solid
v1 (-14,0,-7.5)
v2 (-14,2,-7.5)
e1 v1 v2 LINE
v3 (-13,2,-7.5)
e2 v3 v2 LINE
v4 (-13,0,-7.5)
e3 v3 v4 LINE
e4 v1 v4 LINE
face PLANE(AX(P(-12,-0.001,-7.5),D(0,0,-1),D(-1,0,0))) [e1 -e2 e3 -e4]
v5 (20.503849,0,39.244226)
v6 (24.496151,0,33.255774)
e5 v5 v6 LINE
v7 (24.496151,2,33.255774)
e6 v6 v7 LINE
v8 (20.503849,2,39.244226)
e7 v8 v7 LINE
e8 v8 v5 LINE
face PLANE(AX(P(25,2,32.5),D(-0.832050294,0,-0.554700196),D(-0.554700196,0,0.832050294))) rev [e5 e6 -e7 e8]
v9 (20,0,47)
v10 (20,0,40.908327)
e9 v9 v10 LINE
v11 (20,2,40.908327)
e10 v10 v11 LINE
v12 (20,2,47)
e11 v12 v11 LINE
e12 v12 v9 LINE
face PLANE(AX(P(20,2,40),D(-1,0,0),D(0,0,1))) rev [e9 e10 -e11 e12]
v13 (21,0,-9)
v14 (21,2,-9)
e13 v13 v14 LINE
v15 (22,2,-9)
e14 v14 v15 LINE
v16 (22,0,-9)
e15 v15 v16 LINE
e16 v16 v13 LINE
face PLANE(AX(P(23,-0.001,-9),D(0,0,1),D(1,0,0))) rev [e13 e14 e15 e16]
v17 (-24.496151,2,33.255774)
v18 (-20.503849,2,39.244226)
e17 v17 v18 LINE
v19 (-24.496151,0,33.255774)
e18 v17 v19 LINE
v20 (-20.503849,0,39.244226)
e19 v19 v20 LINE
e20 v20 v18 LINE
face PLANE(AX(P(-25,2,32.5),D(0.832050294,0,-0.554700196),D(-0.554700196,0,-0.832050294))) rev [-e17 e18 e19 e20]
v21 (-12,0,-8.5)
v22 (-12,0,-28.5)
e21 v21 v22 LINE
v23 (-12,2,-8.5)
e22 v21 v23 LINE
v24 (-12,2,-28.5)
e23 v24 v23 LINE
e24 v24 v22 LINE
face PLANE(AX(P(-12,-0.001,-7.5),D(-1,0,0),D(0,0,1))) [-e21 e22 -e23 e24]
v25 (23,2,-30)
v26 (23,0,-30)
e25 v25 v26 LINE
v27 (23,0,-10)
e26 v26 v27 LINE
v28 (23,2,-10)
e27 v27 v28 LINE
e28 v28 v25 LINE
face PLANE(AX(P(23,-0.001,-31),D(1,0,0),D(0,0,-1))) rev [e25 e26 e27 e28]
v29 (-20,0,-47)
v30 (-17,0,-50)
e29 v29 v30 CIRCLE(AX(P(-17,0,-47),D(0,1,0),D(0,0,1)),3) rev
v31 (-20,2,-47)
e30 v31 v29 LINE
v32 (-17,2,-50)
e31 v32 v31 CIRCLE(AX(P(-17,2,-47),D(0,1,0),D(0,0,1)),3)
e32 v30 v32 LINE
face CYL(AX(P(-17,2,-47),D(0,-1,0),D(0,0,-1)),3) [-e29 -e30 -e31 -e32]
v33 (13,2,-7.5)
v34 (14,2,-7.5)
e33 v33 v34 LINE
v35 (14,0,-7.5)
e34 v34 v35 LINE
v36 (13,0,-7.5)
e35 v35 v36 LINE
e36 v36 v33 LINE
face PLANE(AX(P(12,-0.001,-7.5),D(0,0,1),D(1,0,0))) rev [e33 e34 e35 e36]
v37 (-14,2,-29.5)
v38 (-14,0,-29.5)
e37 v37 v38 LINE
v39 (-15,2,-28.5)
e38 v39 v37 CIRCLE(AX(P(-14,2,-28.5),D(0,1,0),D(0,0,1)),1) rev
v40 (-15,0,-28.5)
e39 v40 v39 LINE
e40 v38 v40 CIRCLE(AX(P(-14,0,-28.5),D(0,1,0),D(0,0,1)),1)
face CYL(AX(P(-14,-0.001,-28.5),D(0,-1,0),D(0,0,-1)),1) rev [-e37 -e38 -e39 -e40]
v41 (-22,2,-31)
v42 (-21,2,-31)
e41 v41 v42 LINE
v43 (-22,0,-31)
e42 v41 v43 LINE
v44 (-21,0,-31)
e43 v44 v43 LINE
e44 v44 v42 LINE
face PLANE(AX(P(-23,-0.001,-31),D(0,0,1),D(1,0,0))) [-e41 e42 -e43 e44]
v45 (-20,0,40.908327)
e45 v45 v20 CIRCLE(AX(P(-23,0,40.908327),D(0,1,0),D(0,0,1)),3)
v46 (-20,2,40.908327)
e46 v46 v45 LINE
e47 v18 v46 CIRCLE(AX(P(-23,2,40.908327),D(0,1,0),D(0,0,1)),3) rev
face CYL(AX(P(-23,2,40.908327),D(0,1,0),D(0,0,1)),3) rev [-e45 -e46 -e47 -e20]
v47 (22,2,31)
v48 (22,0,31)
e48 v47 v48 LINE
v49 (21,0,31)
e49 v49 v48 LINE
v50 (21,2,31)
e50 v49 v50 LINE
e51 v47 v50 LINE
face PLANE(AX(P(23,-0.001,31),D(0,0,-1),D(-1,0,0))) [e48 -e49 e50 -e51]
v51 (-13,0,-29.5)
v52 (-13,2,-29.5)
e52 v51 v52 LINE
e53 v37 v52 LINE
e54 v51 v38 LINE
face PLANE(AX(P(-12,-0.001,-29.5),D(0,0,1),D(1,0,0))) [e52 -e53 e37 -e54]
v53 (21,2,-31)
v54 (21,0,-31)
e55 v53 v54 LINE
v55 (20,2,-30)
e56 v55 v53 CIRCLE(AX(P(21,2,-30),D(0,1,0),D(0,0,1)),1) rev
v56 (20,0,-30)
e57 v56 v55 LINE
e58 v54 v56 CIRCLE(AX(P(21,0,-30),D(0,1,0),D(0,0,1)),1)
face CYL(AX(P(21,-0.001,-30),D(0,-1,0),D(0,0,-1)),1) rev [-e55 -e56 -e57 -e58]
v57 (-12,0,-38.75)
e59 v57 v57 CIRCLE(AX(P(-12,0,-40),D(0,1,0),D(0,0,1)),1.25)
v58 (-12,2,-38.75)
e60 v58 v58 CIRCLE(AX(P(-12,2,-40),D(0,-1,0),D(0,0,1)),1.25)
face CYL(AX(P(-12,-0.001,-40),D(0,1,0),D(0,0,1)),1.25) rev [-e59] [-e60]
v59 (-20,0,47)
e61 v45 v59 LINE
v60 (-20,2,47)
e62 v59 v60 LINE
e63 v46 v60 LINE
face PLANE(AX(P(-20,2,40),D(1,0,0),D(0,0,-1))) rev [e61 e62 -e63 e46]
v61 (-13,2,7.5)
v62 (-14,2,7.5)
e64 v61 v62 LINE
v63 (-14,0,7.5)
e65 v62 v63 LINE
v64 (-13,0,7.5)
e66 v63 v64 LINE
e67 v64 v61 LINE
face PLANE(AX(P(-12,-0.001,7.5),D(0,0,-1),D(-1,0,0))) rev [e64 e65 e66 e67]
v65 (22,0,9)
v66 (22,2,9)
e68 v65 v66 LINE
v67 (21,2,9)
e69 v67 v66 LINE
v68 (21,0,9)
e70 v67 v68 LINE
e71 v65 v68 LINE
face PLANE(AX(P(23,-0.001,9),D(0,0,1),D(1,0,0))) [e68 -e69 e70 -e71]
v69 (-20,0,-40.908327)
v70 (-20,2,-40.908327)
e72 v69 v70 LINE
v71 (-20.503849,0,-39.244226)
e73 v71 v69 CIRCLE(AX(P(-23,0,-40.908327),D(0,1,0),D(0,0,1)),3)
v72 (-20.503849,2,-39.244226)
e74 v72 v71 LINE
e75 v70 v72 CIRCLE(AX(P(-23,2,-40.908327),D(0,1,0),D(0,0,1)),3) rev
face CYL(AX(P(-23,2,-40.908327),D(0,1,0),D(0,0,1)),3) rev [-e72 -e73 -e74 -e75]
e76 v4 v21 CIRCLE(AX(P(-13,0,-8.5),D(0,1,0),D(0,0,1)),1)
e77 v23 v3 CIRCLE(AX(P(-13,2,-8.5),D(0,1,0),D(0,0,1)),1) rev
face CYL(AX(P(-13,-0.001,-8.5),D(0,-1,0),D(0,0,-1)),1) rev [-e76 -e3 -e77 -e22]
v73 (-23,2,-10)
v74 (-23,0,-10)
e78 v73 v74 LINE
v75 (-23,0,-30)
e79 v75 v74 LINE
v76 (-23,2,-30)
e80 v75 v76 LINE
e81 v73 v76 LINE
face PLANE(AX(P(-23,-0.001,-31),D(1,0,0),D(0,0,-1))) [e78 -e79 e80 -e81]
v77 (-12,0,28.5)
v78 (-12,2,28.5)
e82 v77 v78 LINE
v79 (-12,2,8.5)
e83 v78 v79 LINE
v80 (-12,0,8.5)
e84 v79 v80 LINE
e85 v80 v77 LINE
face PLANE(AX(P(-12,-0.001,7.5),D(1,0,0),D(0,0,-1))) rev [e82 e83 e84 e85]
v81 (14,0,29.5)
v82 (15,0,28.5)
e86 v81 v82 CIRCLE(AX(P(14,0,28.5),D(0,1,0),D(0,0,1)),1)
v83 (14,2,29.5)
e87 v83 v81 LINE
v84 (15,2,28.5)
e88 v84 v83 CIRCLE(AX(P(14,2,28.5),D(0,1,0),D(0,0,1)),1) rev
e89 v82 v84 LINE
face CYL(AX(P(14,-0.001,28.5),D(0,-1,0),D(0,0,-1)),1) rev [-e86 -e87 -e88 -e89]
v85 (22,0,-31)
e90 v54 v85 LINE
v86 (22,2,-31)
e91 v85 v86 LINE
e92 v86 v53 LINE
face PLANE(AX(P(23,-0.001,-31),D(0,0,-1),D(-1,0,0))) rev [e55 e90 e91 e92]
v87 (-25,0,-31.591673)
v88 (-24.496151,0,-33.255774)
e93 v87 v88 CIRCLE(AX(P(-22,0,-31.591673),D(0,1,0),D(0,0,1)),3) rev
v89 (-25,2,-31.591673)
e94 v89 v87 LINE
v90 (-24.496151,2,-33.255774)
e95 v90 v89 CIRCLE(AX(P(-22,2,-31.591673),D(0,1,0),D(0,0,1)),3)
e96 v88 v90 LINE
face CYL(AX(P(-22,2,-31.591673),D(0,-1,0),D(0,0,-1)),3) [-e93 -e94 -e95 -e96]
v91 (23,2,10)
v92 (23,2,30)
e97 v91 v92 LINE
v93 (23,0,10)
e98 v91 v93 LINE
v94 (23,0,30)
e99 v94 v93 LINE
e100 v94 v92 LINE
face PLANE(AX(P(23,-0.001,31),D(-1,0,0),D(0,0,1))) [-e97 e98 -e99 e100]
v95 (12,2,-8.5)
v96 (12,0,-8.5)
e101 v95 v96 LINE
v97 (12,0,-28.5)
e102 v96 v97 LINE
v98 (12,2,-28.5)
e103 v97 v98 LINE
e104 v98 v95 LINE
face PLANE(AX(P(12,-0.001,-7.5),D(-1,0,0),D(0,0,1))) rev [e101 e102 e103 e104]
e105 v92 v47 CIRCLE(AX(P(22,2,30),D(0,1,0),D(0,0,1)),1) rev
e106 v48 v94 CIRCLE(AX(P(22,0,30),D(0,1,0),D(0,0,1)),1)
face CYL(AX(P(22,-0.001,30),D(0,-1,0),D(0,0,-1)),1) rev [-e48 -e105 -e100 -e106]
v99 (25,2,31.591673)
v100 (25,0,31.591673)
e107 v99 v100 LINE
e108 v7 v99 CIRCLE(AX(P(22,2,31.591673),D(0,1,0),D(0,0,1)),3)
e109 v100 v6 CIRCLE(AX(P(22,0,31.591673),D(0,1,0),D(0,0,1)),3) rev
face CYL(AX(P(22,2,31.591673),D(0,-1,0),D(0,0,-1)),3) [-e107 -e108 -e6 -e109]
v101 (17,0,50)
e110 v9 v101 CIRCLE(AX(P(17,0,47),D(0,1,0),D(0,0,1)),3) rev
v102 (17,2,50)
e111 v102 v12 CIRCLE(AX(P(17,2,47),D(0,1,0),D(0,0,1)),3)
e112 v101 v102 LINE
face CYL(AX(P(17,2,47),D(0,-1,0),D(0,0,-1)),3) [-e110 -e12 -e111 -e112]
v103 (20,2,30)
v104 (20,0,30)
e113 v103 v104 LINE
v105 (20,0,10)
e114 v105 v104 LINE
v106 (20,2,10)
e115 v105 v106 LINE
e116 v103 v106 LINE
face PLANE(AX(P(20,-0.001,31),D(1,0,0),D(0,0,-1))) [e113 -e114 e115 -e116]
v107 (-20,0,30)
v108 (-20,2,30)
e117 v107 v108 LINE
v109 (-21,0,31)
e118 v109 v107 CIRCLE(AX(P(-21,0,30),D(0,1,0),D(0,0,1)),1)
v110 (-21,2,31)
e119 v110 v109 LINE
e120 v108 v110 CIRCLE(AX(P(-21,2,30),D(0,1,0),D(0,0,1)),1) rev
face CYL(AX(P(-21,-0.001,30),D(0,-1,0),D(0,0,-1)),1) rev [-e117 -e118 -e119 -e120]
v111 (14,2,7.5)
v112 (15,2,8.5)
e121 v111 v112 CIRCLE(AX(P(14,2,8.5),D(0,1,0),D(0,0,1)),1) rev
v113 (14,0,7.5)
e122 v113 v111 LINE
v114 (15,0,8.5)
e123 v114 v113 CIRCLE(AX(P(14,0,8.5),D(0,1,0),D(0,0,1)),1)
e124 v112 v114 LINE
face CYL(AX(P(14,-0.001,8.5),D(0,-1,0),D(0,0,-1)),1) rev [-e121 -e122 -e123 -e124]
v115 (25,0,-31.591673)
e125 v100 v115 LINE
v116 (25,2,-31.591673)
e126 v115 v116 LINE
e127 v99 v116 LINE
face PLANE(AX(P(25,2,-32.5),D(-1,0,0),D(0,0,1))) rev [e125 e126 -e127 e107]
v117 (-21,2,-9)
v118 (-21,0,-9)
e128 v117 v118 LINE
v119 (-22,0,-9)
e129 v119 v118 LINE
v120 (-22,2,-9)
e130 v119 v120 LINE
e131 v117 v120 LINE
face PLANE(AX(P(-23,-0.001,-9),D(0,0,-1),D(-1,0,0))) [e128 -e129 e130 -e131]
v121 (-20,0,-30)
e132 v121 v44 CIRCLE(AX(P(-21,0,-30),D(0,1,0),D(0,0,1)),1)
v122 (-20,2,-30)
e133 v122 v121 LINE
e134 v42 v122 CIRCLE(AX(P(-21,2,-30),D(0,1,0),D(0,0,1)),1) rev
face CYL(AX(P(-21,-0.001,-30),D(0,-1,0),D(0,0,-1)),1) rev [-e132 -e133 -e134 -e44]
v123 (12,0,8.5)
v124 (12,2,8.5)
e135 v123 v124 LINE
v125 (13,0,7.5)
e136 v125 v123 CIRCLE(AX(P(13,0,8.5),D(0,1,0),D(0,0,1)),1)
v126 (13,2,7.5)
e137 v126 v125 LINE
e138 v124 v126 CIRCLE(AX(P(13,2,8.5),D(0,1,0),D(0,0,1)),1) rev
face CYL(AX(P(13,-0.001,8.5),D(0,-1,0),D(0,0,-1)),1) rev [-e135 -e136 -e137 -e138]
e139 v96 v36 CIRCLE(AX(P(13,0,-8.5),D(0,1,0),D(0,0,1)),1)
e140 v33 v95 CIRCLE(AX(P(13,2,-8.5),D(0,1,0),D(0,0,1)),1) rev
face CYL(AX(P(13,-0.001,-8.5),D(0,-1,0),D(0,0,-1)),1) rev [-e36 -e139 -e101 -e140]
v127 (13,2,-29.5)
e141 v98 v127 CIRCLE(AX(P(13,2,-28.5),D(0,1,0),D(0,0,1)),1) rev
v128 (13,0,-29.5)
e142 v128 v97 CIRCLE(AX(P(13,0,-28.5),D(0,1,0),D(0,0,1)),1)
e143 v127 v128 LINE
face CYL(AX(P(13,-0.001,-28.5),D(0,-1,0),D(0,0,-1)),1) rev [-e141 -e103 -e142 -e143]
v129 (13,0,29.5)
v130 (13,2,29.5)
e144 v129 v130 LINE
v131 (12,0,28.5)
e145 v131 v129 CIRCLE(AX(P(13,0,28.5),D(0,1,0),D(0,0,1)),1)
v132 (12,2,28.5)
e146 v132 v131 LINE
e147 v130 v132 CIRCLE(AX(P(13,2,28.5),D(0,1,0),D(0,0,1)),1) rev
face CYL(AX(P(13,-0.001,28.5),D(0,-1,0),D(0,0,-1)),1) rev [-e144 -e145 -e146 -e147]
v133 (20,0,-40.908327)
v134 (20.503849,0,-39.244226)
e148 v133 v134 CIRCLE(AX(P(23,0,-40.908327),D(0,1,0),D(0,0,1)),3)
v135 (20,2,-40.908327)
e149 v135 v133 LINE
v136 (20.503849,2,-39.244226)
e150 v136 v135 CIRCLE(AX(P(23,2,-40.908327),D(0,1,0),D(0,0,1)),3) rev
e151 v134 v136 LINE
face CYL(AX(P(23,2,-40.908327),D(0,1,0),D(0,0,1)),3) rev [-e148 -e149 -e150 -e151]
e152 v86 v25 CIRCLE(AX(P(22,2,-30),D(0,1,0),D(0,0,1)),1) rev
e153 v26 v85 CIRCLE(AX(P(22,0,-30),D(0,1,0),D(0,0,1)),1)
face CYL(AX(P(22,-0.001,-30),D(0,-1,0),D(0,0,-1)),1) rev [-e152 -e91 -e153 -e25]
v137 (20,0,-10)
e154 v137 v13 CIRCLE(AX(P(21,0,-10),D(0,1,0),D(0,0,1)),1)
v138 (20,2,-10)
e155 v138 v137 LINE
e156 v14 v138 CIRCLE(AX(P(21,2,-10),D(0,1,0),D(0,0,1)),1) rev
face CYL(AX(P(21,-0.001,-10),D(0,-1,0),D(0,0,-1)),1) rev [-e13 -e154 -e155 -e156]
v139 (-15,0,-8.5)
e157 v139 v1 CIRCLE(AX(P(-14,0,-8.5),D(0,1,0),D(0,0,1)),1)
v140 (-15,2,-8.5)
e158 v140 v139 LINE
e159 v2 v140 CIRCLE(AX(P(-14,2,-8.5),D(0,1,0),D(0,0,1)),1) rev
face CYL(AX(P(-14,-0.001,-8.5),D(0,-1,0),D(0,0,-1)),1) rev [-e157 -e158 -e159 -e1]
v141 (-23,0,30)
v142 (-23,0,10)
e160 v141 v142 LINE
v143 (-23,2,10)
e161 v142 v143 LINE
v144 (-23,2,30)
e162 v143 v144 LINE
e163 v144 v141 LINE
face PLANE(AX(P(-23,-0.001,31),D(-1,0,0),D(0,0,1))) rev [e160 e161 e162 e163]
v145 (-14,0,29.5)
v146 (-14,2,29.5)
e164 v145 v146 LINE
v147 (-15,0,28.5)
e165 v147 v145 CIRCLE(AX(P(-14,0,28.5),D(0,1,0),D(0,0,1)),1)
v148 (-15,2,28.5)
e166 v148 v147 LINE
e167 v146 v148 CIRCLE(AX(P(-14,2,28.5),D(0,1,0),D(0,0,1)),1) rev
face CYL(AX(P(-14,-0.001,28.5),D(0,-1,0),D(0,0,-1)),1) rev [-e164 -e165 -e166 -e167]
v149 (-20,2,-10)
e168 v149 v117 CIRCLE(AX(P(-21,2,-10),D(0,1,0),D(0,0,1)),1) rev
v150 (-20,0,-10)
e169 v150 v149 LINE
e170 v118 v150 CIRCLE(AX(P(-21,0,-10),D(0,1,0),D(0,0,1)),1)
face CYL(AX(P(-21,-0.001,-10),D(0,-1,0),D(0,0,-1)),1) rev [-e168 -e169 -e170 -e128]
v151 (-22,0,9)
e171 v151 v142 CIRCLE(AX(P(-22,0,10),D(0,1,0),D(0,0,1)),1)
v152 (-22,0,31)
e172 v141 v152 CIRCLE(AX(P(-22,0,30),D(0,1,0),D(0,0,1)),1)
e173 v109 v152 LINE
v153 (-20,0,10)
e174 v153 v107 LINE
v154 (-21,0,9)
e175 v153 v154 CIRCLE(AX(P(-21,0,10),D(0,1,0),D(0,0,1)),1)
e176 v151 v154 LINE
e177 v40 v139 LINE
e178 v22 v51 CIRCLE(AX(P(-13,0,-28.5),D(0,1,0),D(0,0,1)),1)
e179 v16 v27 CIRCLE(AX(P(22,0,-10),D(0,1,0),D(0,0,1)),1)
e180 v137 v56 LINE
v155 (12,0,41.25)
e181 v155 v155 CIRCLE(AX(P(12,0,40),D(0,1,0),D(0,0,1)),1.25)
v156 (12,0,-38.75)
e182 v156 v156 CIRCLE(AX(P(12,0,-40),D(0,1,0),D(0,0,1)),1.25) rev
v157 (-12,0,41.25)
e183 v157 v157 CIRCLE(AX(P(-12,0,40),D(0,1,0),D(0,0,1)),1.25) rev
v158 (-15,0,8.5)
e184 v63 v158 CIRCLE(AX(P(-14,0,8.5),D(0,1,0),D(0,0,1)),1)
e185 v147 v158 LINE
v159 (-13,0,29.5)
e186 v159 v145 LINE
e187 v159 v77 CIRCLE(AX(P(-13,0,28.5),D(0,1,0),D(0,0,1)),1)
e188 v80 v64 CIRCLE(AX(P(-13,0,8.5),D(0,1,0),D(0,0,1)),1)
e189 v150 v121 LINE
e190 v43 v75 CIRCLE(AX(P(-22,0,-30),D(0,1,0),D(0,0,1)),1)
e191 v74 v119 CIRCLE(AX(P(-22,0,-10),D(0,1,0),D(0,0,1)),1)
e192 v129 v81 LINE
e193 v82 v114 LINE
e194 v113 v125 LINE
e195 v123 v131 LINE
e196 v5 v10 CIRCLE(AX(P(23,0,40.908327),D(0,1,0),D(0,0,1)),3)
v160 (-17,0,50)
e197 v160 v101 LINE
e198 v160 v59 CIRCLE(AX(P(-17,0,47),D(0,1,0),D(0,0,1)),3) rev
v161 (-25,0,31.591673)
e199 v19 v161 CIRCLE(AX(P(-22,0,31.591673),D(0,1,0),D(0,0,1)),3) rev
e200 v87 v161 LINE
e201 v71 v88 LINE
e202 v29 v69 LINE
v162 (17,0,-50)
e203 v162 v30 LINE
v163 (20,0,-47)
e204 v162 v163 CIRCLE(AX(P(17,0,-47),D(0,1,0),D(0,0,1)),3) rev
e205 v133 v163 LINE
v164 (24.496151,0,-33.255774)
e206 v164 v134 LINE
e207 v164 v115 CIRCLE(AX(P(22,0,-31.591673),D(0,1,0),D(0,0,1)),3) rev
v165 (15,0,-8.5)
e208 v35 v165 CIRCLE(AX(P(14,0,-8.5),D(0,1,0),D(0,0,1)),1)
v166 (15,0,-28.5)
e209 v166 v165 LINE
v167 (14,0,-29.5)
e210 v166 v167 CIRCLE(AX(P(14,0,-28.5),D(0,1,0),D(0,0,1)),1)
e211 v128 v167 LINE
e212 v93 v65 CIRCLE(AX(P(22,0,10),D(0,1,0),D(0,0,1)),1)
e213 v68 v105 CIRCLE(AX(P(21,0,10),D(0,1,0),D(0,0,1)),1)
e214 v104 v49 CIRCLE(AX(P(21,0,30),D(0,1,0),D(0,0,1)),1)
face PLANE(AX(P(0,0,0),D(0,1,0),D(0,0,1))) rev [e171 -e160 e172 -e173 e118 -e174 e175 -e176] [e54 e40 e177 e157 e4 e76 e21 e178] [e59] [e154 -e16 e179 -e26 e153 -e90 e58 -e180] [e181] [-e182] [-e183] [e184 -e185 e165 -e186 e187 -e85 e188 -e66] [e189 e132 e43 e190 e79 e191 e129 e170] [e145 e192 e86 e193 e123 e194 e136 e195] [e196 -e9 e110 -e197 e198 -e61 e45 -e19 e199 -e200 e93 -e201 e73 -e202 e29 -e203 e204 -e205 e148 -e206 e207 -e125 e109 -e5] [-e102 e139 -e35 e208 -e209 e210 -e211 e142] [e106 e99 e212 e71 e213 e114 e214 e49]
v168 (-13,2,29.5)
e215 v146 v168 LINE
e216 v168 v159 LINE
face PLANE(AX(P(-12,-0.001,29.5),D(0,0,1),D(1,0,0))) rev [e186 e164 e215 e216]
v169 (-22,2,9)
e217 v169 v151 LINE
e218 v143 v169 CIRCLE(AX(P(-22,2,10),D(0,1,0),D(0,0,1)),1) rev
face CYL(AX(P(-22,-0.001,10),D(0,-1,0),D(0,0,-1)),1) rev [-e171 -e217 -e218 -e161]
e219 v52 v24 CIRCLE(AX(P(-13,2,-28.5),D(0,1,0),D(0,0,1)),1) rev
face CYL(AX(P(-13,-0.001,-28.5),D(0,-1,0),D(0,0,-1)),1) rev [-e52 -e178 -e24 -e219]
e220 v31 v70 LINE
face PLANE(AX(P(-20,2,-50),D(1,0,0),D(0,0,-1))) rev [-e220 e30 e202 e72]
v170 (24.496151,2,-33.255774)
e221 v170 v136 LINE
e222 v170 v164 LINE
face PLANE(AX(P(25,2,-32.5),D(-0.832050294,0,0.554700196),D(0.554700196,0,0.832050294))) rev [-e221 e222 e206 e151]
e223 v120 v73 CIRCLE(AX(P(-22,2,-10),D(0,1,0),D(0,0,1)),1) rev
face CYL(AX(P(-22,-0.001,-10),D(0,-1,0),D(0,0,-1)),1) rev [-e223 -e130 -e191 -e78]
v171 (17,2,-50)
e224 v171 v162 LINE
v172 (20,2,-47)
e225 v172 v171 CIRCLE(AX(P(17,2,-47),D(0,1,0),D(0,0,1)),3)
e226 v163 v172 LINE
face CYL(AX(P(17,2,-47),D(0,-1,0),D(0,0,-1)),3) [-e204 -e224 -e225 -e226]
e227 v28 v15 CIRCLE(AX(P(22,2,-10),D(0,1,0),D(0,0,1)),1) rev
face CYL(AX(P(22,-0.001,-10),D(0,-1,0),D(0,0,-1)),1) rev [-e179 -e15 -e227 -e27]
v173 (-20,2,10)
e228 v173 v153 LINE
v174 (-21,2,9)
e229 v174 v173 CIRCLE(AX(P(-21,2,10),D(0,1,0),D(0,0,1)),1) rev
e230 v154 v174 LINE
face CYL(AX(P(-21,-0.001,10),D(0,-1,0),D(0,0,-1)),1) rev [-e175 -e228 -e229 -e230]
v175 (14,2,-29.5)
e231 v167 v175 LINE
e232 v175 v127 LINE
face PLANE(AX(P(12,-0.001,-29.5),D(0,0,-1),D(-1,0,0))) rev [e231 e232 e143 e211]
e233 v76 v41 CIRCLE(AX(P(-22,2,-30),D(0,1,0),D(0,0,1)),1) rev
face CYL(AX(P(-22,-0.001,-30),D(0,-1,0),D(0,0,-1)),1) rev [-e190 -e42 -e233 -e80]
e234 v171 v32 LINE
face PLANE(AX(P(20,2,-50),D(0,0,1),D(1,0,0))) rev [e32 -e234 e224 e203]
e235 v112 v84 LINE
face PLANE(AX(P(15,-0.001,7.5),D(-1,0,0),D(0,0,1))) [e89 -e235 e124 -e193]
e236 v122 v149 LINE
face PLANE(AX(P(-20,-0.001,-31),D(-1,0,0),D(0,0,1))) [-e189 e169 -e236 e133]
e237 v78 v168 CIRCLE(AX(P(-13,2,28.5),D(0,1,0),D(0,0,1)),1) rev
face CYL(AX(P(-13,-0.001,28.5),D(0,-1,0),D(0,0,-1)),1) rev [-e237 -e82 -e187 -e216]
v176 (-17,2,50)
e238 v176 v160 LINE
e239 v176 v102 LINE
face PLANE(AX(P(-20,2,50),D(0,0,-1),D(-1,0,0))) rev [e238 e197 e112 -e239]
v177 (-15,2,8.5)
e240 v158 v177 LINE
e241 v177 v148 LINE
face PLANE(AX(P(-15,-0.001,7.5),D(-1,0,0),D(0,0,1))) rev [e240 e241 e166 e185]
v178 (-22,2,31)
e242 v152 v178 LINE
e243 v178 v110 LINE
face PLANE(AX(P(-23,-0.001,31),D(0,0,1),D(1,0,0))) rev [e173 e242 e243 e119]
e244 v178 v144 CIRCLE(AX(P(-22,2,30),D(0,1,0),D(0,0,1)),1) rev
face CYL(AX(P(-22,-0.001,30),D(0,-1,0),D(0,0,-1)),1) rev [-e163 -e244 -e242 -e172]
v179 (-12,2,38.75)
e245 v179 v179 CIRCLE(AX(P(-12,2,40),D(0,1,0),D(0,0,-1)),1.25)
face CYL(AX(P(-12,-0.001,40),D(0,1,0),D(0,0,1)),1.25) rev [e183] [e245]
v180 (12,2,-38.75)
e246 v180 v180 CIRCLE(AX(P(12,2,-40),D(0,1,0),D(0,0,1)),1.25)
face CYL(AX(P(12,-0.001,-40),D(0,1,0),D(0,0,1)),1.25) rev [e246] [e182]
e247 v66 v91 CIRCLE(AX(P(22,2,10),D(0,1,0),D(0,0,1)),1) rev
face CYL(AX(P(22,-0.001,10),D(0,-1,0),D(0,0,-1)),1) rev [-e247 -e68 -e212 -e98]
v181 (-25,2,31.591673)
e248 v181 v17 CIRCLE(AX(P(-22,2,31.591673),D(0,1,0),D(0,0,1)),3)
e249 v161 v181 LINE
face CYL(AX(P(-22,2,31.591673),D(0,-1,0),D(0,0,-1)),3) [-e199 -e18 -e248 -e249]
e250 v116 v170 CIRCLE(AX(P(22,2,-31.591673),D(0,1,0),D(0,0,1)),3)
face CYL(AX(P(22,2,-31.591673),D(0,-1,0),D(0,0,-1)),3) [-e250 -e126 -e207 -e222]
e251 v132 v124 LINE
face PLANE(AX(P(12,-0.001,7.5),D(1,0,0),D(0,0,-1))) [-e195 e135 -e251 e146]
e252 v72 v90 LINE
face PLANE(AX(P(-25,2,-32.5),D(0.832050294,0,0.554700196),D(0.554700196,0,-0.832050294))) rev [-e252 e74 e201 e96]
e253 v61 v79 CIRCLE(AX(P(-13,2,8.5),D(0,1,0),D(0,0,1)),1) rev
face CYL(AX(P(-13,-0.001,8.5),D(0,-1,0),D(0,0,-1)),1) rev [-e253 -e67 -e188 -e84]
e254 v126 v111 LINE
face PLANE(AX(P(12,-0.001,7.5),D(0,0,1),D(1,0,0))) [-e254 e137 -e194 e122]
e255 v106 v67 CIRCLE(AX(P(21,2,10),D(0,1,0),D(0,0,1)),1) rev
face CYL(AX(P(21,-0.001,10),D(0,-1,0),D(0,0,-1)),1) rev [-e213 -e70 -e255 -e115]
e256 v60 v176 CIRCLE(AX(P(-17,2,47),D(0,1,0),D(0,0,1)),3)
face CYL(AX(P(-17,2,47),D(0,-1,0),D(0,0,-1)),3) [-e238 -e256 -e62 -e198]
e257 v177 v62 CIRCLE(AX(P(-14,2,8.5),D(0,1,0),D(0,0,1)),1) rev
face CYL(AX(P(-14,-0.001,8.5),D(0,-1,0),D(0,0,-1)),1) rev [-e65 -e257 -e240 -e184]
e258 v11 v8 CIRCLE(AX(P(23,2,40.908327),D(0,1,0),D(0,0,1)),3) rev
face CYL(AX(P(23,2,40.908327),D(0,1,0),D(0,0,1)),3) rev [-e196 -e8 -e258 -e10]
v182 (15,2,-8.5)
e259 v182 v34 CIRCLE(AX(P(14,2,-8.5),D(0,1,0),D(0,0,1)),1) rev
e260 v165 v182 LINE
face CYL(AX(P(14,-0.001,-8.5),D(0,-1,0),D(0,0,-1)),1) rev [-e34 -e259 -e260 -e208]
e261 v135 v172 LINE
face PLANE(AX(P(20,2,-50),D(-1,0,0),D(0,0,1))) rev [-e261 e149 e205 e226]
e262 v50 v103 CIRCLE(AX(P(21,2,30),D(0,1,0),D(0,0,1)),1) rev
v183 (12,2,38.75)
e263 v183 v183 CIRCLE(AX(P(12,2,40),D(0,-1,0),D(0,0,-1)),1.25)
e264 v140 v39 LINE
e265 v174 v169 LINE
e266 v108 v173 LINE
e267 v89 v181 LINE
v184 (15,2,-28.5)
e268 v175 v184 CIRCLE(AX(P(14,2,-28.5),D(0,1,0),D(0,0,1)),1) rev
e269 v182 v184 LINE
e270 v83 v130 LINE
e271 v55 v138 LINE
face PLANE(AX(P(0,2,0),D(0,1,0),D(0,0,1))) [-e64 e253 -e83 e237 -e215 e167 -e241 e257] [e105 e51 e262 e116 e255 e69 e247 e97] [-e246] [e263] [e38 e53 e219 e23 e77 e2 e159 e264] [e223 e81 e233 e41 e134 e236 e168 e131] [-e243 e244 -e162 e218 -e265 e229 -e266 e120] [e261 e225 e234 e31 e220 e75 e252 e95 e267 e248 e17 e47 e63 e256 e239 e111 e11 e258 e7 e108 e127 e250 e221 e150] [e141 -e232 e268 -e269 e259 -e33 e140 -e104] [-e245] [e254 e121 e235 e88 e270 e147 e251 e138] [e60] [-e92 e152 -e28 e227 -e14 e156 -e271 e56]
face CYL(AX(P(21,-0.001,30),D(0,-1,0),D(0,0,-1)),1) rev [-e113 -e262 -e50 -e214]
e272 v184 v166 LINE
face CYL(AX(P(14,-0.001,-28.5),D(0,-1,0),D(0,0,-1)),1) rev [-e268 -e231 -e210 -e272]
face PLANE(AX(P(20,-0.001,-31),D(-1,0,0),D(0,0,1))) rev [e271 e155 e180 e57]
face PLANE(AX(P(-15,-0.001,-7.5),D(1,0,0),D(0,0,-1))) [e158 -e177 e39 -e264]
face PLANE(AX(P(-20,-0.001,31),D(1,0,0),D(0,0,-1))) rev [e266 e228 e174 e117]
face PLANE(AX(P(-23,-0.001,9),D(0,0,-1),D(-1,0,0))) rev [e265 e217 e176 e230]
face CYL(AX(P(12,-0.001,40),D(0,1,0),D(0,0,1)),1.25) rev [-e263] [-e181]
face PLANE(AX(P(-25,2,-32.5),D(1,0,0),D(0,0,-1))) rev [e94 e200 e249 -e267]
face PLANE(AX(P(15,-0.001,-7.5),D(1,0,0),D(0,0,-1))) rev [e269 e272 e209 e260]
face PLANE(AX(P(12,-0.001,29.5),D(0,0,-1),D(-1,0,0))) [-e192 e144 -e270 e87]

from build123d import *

# Parameters (mm, degrees)
BOSS_EXTRUDE1_DEPTH  = 2
FILLET1_R            = 3
CUT_EXTRUDE1_REACH   = 57.937
SKETCH2_R            = 1.25
SKETCH2_W            = 3
SKETCH2_H            = 22
FILLET2_R            = 1
FILLET2_OF_MIRROR1_R = 1
MIRROR2_OUTLINE_R    = 1.25
MIRROR2_DEPTH        = 2


# Read off the part's stored shape, not the designer's step: Mirror2
with BuildPart() as part:
    # Sketch1 → Boss-Extrude1 (new body)
    with BuildSketch(Plane(origin=(0, 0, 0), x_dir=(1, 0, 0), z_dir=(0, 1, 0))):
        Polygon((20, 50), (-20, 50), (-20, 40), (-25, 32.5), (-25, -32.5), (-20, -40), (-20, -50), (20, -50), (20, -40), (25, -32.5), (25, 32.5), (20, 40), align=None)
    extrude(amount=BOSS_EXTRUDE1_DEPTH)

    # Fillet1
    fillet1_edges = [part.edges().sort_by_distance(p)[0] for p in [
        (-20, 1, -50),
        (20, 1, -50),
        (20, 1, -40),
        (25, 1, -32.5),
        (25, 1, 32.5),
        (20, 1, 40),
        (20, 1, 50),
        (-20, 1, 50),
        (-20, 1, 40),
        (-25, 1, 32.5),
        (-25, 1, -32.5),
        (-20, 1, -40),
    ]]
    fillet(fillet1_edges, radius=FILLET1_R)

    # Sketch2 → Cut-Extrude1 (cut, up to next)
    with BuildSketch(Plane(origin=(0, 2, 0), x_dir=(1, 0, 0), z_dir=(0, 1, 0)), mode=Mode.PRIVATE) as cut_extrude1_sk1:
        with Locations(Location((12, 40, 0), (0, 0, 270))):
            Circle(SKETCH2_R)
    cut_extrude1_tool1 = extrude(cut_extrude1_sk1.sketch, amount=-CUT_EXTRUDE1_REACH, mode=Mode.PRIVATE) & part.part
    # Sketch2 → Cut-Extrude1 (cut, up to next)
    with BuildSketch(Plane(origin=(0, 2, 0), x_dir=(1, 0, 0), z_dir=(0, 1, 0)), mode=Mode.PRIVATE) as cut_extrude1_sk2:
        with Locations((21.5, 20)):
            Rectangle(SKETCH2_W, SKETCH2_H)
    cut_extrude1_tool2 = extrude(cut_extrude1_sk2.sketch, amount=-CUT_EXTRUDE1_REACH, mode=Mode.PRIVATE) & part.part
    # Sketch2 → Cut-Extrude1 (cut, up to next)
    with BuildSketch(Plane(origin=(0, 2, 0), x_dir=(1, 0, 0), z_dir=(0, 1, 0)), mode=Mode.PRIVATE) as cut_extrude1_sk3:
        with Locations((13.5, 18.5)):
            Rectangle(SKETCH2_W, SKETCH2_H)
    cut_extrude1_tool3 = extrude(cut_extrude1_sk3.sketch, amount=-CUT_EXTRUDE1_REACH, mode=Mode.PRIVATE) & part.part
    cut_extrude1_1 = cut_extrude1_tool1.solids().sort_by_distance((12, 2, -40))[0]
    add(cut_extrude1_1, mode=Mode.SUBTRACT)
    cut_extrude1_2 = cut_extrude1_tool2.solids().sort_by_distance((21.5, 2, -20))[0]
    add(cut_extrude1_2, mode=Mode.SUBTRACT)
    cut_extrude1_3 = cut_extrude1_tool3.solids().sort_by_distance((13.5, 2, -18.5))[0]
    add(cut_extrude1_3, mode=Mode.SUBTRACT)
    cut_extrude1 = cut_extrude1_1 + cut_extrude1_2 + cut_extrude1_3  # Cut-Extrude1 as one shape, for the pattern or mirror that repeats it

    # Fillet2
    fillet2_edges = [part.edges().sort_by_distance(p)[0] for p in [
        (20, 1, -9),
        (20, 1, -31),
        (23, 1, -31),
        (23, 1, -9),
        (15, 1, -29.5),
        (15, 1, -7.5),
        (12, 1, -7.5),
        (12, 1, -29.5),
    ]]
    fillet(fillet2_edges, radius=FILLET2_R)

    # Mirror1: Cut-Extrude1 across plane
    add(cut_extrude1.mirror(Plane.XY), mode=Mode.SUBTRACT)

    # Fillet2 of Mirror1
    fillet2_of_mirror1_edges = [part.edges().sort_by_distance(p)[0] for p in [
        (20, 1, 9),
        (20, 1, 31),
        (23, 1, 31),
        (23, 1, 9),
        (15, 1, 29.5),
        (15, 1, 7.5),
        (12, 1, 7.5),
        (12, 1, 29.5),
    ]]
    fillet(fillet2_of_mirror1_edges, radius=FILLET2_OF_MIRROR1_R)

    # Mirror2 outline → Mirror2 (cut)
    with BuildSketch(Plane(origin=(0, 0, 0), x_dir=(1, 0, 0), z_dir=(0, 1, 0))):
        with BuildLine():
            Line((-20, 10), (-20, 30))
            ThreePointArc((-20, 30), (-20.292893219, 30.707106781), (-21, 31))
            Line((-21, 31), (-22, 31))
            ThreePointArc((-22, 31), (-22.707106781, 30.707106781), (-23, 30))
            Line((-23, 30), (-23, 10))
            ThreePointArc((-23, 10), (-22.707106781, 9.292893219), (-22, 9))
            Line((-22, 9), (-21, 9))
            ThreePointArc((-21, 9), (-20.292893219, 9.292893219), (-20, 10))
        make_face()
        with BuildLine():
            ThreePointArc((-21, -31), (-20.292893219, -30.707106781), (-20, -30))
            Line((-20, -30), (-20, -10))
            ThreePointArc((-20, -10), (-20.292893219, -9.292893219), (-21, -9))
            Line((-21, -9), (-22, -9))
            ThreePointArc((-22, -9), (-22.707106781, -9.292893219), (-23, -10))
            Line((-23, -10), (-23, -30))
            ThreePointArc((-23, -30), (-22.707106781, -30.707106781), (-22, -31))
            Line((-22, -31), (-21, -31))
        make_face()
        with BuildLine():
            Line((-14, 7.5), (-13, 7.5))
            ThreePointArc((-13, 7.5), (-12.292893219, 7.792893219), (-12, 8.5))
            Line((-12, 8.5), (-12, 28.5))
            ThreePointArc((-12, 28.5), (-12.292893219, 29.207106781), (-13, 29.5))
            Line((-13, 29.5), (-14, 29.5))
            ThreePointArc((-14, 29.5), (-14.707106781, 29.207106781), (-15, 28.5))
            Line((-15, 28.5), (-15, 8.5))
            ThreePointArc((-15, 8.5), (-14.707106781, 7.792893219), (-14, 7.5))
        make_face()
        with BuildLine():
            ThreePointArc((-15, -28.5), (-14.707106781, -29.207106781), (-14, -29.5))
            Line((-14, -29.5), (-13, -29.5))
            ThreePointArc((-13, -29.5), (-12.292893219, -29.207106781), (-12, -28.5))
            Line((-12, -28.5), (-12, -8.5))
            ThreePointArc((-12, -8.5), (-12.292893219, -7.792893219), (-13, -7.5))
            Line((-13, -7.5), (-14, -7.5))
            ThreePointArc((-14, -7.5), (-14.707106781, -7.792893219), (-15, -8.5))
            Line((-15, -8.5), (-15, -28.5))
        make_face()
        with Locations((-12, 40)):
            Circle(MIRROR2_OUTLINE_R)
        with Locations((-12, -40)):
            Circle(MIRROR2_OUTLINE_R)
    extrude(amount=MIRROR2_DEPTH, mode=Mode.SUBTRACT)


solid = part.part
